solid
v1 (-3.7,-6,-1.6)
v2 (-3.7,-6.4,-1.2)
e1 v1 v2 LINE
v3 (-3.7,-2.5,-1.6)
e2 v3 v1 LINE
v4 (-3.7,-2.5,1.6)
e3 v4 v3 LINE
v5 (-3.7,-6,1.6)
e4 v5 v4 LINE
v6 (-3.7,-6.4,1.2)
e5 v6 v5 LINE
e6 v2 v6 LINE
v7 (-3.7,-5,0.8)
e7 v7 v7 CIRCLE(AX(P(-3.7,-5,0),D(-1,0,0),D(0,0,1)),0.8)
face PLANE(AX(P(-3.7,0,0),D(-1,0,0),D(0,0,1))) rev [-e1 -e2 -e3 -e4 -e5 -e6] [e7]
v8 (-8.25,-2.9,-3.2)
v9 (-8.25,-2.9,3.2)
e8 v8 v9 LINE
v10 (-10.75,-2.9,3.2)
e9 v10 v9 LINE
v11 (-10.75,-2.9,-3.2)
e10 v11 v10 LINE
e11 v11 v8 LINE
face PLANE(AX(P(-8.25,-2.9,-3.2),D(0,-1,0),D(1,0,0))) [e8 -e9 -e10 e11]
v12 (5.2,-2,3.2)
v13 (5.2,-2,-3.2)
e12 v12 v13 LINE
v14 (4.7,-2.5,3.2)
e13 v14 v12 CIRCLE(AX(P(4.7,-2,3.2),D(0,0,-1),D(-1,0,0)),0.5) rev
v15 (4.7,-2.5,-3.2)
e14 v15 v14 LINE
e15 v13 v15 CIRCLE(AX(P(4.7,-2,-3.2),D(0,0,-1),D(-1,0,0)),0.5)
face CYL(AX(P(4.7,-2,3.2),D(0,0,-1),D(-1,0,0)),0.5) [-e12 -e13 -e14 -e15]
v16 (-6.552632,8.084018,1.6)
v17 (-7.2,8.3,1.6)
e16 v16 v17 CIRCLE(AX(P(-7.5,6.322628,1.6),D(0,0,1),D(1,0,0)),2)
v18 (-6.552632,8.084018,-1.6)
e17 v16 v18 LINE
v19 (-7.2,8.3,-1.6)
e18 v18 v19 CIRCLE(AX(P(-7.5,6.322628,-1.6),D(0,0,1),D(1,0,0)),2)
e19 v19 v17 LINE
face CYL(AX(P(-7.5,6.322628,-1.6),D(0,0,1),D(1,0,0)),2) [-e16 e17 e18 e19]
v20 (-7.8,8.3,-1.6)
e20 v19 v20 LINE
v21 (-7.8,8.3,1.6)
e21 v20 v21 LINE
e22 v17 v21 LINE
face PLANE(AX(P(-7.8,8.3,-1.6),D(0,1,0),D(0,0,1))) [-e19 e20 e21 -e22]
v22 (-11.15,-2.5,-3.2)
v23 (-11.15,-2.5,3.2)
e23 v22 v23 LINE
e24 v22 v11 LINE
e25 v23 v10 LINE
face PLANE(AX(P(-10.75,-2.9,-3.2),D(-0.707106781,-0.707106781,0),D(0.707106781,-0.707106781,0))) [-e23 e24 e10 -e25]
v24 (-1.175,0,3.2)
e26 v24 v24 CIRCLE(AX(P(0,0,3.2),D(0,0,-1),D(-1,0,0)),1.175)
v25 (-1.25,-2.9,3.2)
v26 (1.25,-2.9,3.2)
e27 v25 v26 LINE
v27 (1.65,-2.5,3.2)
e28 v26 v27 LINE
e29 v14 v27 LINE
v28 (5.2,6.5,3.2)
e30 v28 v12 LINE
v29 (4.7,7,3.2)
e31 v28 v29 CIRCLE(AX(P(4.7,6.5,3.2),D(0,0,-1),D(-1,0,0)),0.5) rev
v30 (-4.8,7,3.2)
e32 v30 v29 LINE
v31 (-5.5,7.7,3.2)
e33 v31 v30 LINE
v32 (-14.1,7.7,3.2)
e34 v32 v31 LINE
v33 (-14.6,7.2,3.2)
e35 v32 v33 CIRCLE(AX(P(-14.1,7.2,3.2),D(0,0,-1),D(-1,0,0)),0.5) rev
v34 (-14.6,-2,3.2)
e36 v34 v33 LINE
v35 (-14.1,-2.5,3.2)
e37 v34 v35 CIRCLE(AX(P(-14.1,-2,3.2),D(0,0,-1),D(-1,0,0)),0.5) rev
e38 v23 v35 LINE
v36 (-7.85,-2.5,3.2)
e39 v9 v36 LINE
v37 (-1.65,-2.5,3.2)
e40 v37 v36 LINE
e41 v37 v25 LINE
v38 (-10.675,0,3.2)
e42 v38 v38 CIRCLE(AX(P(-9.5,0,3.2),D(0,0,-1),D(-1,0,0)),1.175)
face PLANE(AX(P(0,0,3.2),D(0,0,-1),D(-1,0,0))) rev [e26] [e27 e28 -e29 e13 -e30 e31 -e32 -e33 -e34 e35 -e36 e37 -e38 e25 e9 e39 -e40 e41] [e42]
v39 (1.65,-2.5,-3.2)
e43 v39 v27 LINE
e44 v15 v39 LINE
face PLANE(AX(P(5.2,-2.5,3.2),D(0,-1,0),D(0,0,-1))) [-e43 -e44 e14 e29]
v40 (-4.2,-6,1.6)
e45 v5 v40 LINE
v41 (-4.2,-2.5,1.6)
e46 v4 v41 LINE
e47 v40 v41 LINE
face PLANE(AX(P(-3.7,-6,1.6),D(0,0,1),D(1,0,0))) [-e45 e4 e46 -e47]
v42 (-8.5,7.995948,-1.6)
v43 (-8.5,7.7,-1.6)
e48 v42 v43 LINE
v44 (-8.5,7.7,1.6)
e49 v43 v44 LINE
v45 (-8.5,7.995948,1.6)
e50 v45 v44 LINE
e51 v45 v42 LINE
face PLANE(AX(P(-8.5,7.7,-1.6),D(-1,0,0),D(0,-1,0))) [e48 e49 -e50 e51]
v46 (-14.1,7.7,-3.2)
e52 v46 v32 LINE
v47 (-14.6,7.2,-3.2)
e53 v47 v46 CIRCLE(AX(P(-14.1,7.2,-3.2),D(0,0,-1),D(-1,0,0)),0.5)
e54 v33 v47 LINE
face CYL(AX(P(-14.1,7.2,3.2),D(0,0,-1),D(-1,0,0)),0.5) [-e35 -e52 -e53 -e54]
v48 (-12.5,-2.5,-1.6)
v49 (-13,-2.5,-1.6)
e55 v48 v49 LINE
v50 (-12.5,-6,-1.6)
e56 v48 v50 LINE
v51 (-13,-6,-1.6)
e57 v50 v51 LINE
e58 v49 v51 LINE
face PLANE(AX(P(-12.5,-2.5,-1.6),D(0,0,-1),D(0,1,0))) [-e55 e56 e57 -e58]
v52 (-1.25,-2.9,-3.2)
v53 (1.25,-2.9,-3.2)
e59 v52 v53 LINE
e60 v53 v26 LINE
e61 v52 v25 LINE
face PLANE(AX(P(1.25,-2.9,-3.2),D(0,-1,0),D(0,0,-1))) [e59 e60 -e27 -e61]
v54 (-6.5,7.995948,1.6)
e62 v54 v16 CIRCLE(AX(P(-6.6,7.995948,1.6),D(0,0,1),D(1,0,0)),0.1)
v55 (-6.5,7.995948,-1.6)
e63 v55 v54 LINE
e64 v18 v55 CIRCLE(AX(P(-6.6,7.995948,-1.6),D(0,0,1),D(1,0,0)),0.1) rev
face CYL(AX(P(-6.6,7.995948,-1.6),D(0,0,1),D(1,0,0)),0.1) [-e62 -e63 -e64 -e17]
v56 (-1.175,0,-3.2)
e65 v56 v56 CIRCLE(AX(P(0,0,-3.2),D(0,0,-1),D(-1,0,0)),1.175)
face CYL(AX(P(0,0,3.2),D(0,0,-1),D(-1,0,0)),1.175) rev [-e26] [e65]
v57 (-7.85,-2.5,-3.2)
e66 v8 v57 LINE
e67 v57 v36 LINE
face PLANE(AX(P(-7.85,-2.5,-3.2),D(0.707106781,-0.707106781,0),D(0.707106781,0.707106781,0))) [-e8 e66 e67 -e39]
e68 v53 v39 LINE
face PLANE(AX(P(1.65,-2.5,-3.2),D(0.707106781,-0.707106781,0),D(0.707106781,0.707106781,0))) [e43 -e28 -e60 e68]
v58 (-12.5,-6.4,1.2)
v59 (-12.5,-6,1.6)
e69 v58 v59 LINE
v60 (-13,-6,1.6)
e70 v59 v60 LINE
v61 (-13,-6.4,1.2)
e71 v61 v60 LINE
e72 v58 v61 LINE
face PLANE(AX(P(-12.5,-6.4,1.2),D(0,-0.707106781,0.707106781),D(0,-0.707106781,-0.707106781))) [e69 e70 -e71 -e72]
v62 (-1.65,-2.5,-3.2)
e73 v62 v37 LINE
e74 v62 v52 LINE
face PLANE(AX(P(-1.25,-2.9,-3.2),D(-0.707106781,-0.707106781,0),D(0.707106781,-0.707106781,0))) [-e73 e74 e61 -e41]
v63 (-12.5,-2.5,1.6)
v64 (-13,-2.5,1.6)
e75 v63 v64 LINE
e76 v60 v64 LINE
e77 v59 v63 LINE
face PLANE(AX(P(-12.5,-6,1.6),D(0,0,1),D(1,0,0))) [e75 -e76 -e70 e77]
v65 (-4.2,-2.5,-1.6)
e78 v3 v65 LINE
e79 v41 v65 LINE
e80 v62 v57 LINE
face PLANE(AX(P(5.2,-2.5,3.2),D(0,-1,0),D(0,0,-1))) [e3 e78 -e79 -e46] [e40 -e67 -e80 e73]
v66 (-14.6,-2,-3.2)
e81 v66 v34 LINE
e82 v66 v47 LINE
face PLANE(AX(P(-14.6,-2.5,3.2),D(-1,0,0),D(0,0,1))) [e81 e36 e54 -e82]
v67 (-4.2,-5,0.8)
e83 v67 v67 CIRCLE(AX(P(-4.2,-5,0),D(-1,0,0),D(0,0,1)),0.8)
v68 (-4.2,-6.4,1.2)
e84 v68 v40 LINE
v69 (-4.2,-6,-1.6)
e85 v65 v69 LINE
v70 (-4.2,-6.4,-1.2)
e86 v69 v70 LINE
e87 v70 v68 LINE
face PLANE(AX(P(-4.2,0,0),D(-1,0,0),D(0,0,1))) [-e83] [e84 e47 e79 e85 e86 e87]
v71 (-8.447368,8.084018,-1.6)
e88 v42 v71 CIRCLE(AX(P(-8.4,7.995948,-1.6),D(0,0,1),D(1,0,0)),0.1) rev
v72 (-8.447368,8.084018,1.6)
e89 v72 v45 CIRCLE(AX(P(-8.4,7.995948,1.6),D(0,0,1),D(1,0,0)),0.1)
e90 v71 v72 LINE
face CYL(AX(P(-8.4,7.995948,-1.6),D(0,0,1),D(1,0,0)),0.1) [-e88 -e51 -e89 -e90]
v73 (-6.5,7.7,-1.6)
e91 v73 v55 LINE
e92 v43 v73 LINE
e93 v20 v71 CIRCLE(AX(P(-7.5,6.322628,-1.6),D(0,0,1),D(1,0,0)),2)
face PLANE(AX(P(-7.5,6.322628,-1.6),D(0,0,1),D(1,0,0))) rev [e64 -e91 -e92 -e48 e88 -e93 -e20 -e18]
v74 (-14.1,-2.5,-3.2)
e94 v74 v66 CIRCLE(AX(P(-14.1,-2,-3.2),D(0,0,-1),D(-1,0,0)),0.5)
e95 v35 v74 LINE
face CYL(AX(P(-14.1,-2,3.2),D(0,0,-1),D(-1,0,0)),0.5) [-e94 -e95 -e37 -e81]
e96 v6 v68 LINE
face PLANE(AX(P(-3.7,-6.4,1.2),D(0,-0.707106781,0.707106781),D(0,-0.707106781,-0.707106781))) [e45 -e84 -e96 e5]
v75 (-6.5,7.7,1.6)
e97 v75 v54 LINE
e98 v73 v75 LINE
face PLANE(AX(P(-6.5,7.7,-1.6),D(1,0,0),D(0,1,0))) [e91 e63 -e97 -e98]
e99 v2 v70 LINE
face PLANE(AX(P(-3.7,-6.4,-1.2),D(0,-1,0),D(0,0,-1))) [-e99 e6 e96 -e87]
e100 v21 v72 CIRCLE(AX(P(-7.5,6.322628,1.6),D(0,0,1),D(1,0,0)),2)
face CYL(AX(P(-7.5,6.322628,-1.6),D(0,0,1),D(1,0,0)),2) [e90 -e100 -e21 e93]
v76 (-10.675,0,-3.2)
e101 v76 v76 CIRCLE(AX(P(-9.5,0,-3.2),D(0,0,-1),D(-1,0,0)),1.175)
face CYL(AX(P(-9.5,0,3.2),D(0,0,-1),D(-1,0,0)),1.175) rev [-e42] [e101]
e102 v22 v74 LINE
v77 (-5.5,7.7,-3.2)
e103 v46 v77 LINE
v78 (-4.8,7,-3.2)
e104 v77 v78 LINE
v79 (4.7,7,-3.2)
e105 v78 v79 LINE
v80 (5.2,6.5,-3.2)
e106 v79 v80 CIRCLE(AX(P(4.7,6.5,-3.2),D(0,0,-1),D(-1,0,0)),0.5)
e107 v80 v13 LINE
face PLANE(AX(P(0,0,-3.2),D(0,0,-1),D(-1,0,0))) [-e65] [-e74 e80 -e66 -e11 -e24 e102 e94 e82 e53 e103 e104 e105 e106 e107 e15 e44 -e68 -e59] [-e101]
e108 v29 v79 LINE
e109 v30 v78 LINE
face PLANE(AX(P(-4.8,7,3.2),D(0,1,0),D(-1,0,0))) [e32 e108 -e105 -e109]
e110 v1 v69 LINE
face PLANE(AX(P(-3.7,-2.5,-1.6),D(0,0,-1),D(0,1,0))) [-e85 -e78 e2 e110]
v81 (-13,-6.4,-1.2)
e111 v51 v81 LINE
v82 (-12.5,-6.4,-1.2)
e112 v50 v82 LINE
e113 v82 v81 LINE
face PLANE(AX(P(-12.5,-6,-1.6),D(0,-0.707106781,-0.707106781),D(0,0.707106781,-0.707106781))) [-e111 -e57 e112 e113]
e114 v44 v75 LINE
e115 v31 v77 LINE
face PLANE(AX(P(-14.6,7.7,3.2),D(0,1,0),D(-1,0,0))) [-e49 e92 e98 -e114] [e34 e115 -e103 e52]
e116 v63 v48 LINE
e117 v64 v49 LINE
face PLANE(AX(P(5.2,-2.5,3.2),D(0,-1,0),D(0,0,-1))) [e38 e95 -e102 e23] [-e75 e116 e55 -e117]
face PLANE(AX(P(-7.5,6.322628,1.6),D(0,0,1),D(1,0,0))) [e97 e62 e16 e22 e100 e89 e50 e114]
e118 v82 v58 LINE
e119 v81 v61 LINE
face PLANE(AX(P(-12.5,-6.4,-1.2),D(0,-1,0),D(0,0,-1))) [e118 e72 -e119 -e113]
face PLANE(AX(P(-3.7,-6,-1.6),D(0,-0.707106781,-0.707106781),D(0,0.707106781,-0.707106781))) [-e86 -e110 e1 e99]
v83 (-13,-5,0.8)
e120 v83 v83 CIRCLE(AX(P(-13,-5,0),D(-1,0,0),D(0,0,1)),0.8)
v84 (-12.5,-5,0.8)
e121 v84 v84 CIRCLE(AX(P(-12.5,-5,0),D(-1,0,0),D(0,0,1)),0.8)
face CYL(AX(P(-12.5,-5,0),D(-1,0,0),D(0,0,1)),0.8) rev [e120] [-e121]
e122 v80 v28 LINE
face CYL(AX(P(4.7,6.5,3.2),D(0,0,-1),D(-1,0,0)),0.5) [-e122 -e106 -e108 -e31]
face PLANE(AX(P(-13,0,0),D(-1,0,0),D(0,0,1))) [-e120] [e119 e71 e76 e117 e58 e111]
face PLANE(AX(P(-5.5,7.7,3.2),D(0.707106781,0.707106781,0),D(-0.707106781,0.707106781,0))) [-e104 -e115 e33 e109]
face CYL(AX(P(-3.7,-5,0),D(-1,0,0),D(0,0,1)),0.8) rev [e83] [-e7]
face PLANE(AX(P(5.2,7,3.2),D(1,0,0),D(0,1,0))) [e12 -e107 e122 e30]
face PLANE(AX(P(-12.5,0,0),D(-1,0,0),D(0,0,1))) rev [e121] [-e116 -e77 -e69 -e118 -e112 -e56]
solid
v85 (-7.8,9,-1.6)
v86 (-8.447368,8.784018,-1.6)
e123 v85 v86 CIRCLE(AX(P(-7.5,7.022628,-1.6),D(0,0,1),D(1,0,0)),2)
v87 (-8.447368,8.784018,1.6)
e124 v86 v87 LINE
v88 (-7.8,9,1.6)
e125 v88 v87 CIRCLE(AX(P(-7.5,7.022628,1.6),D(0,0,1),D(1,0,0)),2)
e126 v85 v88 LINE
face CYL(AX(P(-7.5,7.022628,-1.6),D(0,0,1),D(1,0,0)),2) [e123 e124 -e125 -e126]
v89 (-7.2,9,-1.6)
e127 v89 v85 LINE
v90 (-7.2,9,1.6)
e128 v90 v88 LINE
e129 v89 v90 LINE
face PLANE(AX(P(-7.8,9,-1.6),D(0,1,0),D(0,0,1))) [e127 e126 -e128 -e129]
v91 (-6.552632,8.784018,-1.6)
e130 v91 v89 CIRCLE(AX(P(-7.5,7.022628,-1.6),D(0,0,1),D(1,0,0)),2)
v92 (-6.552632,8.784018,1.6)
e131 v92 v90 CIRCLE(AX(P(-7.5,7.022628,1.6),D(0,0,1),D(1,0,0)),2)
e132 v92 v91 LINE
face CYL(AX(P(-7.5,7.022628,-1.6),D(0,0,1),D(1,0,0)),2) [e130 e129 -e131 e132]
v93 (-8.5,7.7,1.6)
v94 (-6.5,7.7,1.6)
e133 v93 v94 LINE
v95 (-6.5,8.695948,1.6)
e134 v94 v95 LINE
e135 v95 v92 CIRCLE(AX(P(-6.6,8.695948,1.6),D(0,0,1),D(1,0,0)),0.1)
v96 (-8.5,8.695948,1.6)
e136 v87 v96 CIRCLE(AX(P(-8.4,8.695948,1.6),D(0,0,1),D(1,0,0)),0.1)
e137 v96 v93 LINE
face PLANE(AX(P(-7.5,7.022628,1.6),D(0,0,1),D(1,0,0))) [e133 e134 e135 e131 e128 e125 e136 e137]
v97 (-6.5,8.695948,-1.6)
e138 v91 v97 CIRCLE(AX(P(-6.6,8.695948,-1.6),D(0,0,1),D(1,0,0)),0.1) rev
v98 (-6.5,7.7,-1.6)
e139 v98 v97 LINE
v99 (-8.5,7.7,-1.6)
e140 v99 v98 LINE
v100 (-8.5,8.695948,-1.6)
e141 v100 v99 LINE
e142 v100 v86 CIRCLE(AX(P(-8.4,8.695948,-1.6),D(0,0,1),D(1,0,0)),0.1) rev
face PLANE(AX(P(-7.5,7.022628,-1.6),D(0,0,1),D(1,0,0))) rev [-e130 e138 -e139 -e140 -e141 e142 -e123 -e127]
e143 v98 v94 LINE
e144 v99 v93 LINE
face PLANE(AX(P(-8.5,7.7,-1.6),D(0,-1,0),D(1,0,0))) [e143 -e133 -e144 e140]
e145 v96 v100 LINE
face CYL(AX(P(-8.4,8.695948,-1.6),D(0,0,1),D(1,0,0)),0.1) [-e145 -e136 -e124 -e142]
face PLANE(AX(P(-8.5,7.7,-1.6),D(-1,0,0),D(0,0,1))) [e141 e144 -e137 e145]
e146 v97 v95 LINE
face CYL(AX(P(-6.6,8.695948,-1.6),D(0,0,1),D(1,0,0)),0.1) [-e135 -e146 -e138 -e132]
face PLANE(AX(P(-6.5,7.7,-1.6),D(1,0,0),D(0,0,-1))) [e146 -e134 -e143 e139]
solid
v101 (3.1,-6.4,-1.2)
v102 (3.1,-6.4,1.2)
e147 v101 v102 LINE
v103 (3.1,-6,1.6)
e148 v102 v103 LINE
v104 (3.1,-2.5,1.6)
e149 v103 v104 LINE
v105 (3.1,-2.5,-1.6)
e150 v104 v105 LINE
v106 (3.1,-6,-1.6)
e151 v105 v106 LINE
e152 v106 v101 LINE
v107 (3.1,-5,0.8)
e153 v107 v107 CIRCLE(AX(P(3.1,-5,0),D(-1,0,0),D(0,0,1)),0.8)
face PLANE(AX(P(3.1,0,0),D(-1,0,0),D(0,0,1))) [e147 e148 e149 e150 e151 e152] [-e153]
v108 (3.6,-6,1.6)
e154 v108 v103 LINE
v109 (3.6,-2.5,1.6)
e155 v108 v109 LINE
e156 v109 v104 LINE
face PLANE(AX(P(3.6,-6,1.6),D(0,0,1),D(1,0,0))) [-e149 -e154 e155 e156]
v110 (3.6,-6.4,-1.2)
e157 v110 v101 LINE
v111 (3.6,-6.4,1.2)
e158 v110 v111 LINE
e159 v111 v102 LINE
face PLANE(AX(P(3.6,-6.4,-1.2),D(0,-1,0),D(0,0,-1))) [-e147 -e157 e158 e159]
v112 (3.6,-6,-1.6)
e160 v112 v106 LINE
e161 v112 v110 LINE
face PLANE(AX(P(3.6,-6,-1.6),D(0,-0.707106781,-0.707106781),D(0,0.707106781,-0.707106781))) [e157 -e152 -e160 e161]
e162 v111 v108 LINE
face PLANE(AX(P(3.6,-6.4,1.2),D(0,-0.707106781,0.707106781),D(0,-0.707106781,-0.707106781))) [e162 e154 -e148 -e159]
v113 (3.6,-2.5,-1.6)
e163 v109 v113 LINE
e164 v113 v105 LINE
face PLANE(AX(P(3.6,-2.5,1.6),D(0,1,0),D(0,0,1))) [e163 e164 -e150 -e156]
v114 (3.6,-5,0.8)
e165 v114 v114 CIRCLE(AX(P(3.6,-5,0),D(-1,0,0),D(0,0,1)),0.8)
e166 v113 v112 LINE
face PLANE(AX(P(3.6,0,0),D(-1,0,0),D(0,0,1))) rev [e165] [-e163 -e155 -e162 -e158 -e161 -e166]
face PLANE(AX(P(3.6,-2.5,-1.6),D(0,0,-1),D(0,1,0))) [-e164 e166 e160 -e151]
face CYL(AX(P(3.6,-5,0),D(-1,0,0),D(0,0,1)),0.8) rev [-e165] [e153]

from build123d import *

# Parameters (mm, degrees)
CROQUIS1_R              = 1.175
SALIENTE_EXTRUIR2_DEPTH = 6.4
SALIENTE_EXTRUIR3_START = -1.6
SALIENTE_EXTRUIR3_DEPTH = 3.2
SALIENTE_EXTRUIR4_START = -1.6
SALIENTE_EXTRUIR4_DEPTH = 3.2
REDONDEO1_R             = 0.1
REDONDEO2_R             = 0.1
SALIENTE_EXTRUIR5_DEPTH = 6.4
SALIENTE_EXTRUIR6_START = -1.6
CROQUIS5_R              = 0.8
SALIENTE_EXTRUIR6_DEPTH = 0.5
SALIENTE_EXTRUIR7_START = -17.7
CROQUIS5_2_R            = 0.8
SALIENTE_EXTRUIR7_DEPTH = 0.5
SALIENTE_EXTRUIR8_START = -10.4
CROQUIS5_3_R            = 0.8
SALIENTE_EXTRUIR8_DEPTH = 0.5
REDONDEO3_R             = 0.5


# Read off the part's stored shape, not the designer's step: SS_01_BASE-1-surface1
with BuildPart() as part:
    # Croquis1 → Saliente-Extruir2 (new body)
    with BuildSketch(Plane(origin=(0, 0, -3.2), x_dir=(-1, 0, 0), z_dir=(0, 0, -1))):
        Polygon((14.6, -2.5), (14.6, 7.7), (5.5, 7.7), (4.8, 7), (-5.2, 7), (-5.2, -2.5), align=None)
        Circle(CROQUIS1_R, mode=Mode.SUBTRACT)
        with Locations((9.5, 0)):
            Circle(CROQUIS1_R, mode=Mode.SUBTRACT)
    extrude(amount=-SALIENTE_EXTRUIR2_DEPTH)

    # Croquis2 → Saliente-Extruir3 (add)
    with BuildSketch(Plane.XY.offset(3.2).offset(SALIENTE_EXTRUIR3_START)):
        with BuildLine():
            Line((-8.5, 7.7), (-8.5, 8.054678814))
            ThreePointArc((-8.5, 8.054678814), (-8.161472313, 8.21007453), (-7.8, 8.3))
            Line((-7.8, 8.3), (-7.2, 8.3))
            ThreePointArc((-7.2, 8.3), (-6.838527687, 8.21007453), (-6.5, 8.054678814))
            Line((-6.5, 8.054678814), (-6.5, 7.7))
            Line((-6.5, 7.7), (-8.5, 7.7))
        make_face()
    extrude(amount=-SALIENTE_EXTRUIR3_DEPTH)

    # Redondeo2
    redondeo2_edges = [part.edges().sort_by_distance(p)[0] for p in [
        (-8.5, 8.054678814, 0),
        (-6.5, 8.054678814, 0),
    ]]
    fillet(redondeo2_edges, radius=REDONDEO2_R)

    # Croquis4 → Saliente-Extruir5 (add)
    with BuildSketch(Plane.XY.offset(3.2)):
        Polygon((-11.15, -2.5), (-7.85, -2.5), (-8.25, -2.9), (-10.75, -2.9), align=None)
        Polygon((-1.65, -2.5), (1.65, -2.5), (1.25, -2.9), (-1.25, -2.9), align=None)
    extrude(amount=-SALIENTE_EXTRUIR5_DEPTH)

    # Croquis5 → Saliente-Extruir6 (add)
    with BuildSketch(Plane.ZY.offset(14.6).offset(SALIENTE_EXTRUIR6_START)):
        Polygon((-1.6, -2.5), (-1.6, -6), (-1.2, -6.4), (1.2, -6.4), (1.6, -6), (1.6, -2.5), align=None)
        with Locations((0, -5)):
            Circle(CROQUIS5_R, mode=Mode.SUBTRACT)
    extrude(amount=-SALIENTE_EXTRUIR6_DEPTH)

    # Croquis5<3> → Saliente-Extruir8 (add)
    with BuildSketch(Plane.ZY.offset(14.6).offset(SALIENTE_EXTRUIR8_START)):
        Polygon((-1.6, -2.5), (-1.6, -6), (-1.2, -6.4), (1.2, -6.4), (1.6, -6), (1.6, -2.5), align=None)
        with Locations((0, -5)):
            Circle(CROQUIS5_3_R, mode=Mode.SUBTRACT)
    extrude(amount=-SALIENTE_EXTRUIR8_DEPTH)

    # Redondeo3
    redondeo3_edges = [part.edges().sort_by_distance(p)[0] for p in [
        (-14.6, 7.7, 0),
        (-14.6, -2.5, 0),
        (5.2, -2.5, 0),
        (5.2, 7, 0),
    ]]
    fillet(redondeo3_edges, radius=REDONDEO3_R)


with BuildPart() as body_2:
    # Croquis3 → Saliente-Extruir4 (new body)
    with BuildSketch(Plane.XY.offset(3.2).offset(SALIENTE_EXTRUIR4_START)):
        with BuildLine():
            Line((-8.5, 7.7), (-6.5, 7.7))
            Line((-6.5, 7.7), (-6.5, 8.754678814))
            ThreePointArc((-6.5, 8.754678814), (-6.838527687, 8.91007453), (-7.2, 9))
            Line((-7.2, 9), (-7.8, 9))
            ThreePointArc((-7.8, 9), (-8.161472313, 8.91007453), (-8.5, 8.754678814))
            Line((-8.5, 8.754678814), (-8.5, 7.7))
        make_face()
    extrude(amount=-SALIENTE_EXTRUIR4_DEPTH)

    # Redondeo1
    redondeo1_edges = [body_2.edges().sort_by_distance(p)[0] for p in [
        (-8.5, 8.754678814, 0),
        (-6.5, 8.754678814, 0),
    ]]
    fillet(redondeo1_edges, radius=REDONDEO1_R)


with BuildPart() as body_3:
    # Croquis5<2> → Saliente-Extruir7 (new body)
    with BuildSketch(Plane.ZY.offset(14.6).offset(SALIENTE_EXTRUIR7_START)):
        Polygon((-1.6, -2.5), (-1.6, -6), (-1.2, -6.4), (1.2, -6.4), (1.6, -6), (1.6, -2.5), align=None)
        with Locations((0, -5)):
            Circle(CROQUIS5_2_R, mode=Mode.SUBTRACT)
    extrude(amount=-SALIENTE_EXTRUIR7_DEPTH)


solid = Compound([part.part, body_2.part, body_3.part])
